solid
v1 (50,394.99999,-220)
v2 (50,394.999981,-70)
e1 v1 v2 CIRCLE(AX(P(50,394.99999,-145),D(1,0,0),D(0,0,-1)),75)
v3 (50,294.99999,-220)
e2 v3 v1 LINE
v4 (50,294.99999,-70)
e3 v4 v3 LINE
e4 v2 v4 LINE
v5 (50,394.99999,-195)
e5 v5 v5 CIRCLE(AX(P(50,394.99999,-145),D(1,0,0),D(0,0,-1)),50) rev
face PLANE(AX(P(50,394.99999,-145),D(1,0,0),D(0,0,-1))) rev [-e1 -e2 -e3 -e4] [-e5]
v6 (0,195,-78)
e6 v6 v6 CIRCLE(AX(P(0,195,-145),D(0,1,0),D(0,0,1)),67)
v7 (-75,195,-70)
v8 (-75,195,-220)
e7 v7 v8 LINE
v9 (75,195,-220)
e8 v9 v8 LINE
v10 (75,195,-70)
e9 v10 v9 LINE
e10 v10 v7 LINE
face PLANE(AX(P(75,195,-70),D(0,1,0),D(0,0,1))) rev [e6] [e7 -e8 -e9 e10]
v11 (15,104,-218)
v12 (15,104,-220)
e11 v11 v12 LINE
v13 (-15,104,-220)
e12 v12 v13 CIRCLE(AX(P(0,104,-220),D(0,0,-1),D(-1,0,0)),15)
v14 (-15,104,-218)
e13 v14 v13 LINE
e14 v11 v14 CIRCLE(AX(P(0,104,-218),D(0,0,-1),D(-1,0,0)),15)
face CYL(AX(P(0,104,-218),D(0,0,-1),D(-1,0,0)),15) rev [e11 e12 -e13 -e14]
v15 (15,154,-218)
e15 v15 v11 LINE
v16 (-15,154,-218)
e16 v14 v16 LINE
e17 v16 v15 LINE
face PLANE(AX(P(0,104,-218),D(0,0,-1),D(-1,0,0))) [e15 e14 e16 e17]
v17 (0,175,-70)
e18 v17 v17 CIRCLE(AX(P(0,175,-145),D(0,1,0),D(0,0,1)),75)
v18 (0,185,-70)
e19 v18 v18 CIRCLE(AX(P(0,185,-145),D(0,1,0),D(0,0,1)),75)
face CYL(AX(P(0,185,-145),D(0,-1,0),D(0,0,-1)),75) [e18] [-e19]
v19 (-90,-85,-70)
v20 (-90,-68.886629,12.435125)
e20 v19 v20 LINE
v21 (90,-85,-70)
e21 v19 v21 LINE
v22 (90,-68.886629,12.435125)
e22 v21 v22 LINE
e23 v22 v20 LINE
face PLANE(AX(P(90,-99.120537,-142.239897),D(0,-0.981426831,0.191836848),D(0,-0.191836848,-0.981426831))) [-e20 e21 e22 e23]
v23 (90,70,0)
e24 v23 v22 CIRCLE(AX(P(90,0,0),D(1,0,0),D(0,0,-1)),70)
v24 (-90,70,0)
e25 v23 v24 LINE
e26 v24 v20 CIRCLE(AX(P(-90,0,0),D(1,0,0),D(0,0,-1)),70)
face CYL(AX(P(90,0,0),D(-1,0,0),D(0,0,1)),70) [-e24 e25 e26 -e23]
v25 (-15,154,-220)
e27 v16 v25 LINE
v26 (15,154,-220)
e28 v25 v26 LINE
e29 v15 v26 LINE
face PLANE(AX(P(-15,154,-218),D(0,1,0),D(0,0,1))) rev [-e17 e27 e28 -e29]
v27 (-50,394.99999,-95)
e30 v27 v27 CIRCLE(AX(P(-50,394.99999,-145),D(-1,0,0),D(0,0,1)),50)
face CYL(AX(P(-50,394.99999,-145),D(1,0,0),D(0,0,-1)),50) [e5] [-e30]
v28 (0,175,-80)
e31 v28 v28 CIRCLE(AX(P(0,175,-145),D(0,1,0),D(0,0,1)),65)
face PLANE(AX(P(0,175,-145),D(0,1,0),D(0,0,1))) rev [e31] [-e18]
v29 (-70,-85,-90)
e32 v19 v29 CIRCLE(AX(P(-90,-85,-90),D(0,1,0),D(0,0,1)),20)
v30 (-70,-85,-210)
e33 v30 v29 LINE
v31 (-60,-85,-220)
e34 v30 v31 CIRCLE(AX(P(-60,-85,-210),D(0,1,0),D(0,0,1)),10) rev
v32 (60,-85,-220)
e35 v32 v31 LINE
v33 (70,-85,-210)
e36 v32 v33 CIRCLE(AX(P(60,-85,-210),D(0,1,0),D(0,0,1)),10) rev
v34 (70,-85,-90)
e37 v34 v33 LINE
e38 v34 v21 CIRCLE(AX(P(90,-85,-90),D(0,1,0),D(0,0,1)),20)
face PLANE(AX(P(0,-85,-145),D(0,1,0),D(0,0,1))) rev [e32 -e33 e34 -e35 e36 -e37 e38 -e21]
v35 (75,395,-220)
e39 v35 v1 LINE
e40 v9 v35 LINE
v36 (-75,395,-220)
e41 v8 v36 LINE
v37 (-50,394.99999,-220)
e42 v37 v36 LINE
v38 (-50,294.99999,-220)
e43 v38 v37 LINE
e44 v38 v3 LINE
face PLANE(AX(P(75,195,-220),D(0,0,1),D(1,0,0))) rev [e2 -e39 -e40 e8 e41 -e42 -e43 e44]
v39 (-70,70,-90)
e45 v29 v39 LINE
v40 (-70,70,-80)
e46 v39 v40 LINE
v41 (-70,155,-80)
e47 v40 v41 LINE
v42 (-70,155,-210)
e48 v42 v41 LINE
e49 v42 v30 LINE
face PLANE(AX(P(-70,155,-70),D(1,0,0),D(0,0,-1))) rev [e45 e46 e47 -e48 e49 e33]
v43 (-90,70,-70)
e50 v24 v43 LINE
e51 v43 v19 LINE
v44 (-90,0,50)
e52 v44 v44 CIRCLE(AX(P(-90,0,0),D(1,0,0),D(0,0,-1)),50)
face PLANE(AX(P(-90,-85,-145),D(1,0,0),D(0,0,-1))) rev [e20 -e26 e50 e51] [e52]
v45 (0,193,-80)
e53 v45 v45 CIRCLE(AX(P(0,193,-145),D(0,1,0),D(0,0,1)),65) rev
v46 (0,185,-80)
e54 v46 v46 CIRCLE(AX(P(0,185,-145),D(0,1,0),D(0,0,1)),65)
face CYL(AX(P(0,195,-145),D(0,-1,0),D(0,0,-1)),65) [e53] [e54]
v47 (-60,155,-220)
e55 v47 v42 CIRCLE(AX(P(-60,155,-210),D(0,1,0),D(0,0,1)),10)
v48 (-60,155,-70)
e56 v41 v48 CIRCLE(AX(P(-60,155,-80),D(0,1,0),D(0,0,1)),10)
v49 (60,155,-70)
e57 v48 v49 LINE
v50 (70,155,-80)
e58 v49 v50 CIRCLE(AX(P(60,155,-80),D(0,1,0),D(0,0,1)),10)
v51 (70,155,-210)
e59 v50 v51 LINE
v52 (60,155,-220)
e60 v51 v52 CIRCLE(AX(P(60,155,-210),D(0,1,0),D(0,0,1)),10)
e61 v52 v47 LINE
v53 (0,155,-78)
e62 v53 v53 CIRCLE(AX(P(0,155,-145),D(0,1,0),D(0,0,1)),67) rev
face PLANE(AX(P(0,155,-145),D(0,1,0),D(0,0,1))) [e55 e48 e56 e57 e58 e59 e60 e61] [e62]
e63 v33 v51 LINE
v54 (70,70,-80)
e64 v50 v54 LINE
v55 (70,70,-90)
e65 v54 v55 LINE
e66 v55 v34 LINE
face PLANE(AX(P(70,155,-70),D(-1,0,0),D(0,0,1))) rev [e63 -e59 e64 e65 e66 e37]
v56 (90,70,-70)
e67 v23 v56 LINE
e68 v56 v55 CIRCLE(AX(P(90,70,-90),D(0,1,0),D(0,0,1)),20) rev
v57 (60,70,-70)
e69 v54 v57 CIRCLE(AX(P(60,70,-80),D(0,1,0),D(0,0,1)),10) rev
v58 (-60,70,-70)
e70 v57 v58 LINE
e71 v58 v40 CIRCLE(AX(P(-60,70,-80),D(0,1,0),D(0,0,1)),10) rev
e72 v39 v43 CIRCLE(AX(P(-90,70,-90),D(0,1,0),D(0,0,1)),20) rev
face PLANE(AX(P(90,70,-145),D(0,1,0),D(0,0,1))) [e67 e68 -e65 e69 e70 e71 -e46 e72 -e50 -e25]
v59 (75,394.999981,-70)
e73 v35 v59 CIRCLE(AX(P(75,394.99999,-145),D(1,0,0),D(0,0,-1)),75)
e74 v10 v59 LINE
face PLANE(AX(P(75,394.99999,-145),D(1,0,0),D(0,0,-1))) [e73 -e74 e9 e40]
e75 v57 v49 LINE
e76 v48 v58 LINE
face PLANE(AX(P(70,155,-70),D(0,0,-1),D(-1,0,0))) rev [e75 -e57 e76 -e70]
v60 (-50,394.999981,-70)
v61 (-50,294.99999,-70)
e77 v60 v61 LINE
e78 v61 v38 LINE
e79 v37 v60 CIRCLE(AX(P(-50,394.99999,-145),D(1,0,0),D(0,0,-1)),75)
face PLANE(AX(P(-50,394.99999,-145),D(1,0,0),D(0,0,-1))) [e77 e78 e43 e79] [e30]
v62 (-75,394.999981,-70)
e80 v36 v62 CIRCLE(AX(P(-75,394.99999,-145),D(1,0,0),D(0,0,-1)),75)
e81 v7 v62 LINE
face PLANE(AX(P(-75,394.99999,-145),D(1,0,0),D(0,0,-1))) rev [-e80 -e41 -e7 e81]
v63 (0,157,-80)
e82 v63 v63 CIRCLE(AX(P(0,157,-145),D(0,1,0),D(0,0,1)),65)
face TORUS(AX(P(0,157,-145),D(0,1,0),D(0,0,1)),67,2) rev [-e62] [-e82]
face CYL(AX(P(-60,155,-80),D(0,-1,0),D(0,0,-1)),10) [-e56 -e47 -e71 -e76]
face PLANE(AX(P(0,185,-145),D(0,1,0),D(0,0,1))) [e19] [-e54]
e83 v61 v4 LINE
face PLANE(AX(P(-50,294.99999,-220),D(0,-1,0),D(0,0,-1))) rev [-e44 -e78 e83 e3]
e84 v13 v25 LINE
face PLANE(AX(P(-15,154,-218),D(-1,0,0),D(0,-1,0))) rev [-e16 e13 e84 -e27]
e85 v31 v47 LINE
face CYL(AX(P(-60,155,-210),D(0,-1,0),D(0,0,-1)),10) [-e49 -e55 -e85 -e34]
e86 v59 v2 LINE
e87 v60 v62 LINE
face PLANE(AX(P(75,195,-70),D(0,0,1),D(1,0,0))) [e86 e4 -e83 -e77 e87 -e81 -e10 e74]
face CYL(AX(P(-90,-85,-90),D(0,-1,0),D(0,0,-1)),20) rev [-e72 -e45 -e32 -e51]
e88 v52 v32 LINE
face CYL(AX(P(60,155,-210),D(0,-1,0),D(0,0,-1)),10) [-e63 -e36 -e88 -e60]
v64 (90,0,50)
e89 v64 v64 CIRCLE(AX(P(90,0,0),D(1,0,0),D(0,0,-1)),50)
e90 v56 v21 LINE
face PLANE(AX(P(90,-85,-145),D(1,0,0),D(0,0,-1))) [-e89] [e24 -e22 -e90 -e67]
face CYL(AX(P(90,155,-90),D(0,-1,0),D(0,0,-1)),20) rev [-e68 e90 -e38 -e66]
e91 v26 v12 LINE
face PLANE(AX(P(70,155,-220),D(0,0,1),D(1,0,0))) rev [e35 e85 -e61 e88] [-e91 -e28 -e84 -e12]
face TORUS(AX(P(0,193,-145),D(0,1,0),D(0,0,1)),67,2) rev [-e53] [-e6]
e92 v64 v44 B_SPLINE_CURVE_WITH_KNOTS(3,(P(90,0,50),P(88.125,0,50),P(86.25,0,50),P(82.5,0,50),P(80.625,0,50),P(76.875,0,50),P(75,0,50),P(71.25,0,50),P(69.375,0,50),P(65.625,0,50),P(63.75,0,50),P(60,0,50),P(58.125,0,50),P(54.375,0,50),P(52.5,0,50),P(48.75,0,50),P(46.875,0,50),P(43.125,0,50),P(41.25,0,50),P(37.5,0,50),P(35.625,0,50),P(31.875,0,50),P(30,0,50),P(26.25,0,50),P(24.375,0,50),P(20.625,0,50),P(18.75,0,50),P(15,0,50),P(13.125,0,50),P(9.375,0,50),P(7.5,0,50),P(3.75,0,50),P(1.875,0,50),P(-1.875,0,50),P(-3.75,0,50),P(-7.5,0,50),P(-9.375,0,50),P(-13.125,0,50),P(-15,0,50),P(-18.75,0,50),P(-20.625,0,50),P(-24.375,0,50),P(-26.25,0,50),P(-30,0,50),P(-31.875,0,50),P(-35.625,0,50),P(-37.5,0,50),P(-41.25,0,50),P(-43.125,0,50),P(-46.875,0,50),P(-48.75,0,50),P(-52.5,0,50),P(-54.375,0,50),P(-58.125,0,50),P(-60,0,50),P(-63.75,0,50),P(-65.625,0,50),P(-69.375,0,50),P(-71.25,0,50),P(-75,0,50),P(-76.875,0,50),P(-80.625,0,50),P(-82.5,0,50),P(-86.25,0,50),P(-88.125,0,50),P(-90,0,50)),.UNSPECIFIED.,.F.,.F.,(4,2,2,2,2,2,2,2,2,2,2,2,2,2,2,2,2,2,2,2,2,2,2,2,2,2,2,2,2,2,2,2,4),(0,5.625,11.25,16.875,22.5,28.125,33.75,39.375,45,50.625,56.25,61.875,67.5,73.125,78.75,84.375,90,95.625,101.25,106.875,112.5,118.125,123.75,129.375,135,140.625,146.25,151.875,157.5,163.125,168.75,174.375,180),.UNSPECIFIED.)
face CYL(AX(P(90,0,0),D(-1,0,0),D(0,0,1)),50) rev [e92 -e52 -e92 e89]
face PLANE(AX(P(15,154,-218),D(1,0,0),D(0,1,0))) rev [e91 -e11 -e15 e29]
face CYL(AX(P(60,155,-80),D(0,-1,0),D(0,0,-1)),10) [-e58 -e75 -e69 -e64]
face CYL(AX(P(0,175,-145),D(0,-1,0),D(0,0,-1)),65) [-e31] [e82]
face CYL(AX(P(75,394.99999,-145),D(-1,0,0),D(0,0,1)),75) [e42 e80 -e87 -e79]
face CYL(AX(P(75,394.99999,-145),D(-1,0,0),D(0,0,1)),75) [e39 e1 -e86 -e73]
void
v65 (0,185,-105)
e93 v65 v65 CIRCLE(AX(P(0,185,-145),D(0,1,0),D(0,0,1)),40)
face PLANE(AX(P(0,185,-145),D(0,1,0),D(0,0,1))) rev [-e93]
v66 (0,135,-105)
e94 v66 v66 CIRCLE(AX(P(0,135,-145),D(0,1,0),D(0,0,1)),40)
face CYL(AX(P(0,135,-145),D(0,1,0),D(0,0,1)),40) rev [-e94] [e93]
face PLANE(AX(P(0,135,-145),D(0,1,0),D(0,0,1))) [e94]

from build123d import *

# Parameters (mm, degrees)
SKETCH1_W           = 140
SKETCH1_H           = 150
BOSS_EXTRUDE1_DEPTH = 240
SKETCH2_R           = 65
BOSS_EXTRUDE2_DEPTH = 20
SKETCH3_R           = 75
BOSS_EXTRUDE3_DEPTH = 10
SKETCH4_R           = 40
CUT_EXTRUDE2_DEPTH  = 50
SKETCH5_R           = 50
BOSS_EXTRUDE4_DEPTH = 90
FILLET1_R           = 2
FILLET2_R           = 20
FILLET3_R           = 10
SKETCH6_R           = 65
BOSS_EXTRUDE5_DEPTH = 10
BOSS_EXTRUDE6_DEPTH = 75
CUT_EXTRUDE3_DEPTH  = 50
SKETCH9_R           = 50
BOSS_EXTRUDE7_DEPTH = 100
FILLET4_R           = 2
CUT_EXTRUDE5_DEPTH  = 2


with BuildPart() as part:
    # Sketch1 → Boss-Extrude1 (new body)
    with BuildSketch(Plane(origin=(0, 0, 0), x_dir=(1, 0, 0), z_dir=(0, 1, 0))):
        Rectangle(SKETCH1_W, SKETCH1_H)
    extrude(amount=BOSS_EXTRUDE1_DEPTH)

    # Sketch2 → Boss-Extrude2 (add)
    with BuildSketch(Plane(origin=(0, 240, 0), x_dir=(1, 0, 0), z_dir=(0, 1, 0))):
        with Locations(Location((0, 0, 0), (0, 0, 270))):
            Circle(SKETCH2_R)
    extrude(amount=BOSS_EXTRUDE2_DEPTH)

    # Sketch3 → Boss-Extrude3 (add)
    with BuildSketch(Plane(origin=(0, 260, 0), x_dir=(1, 0, 0), z_dir=(0, 1, 0))):
        with Locations(Location((0, 0, 0), (0, 0, 270))):
            Circle(SKETCH3_R)
    extrude(amount=BOSS_EXTRUDE3_DEPTH)

    # Sketch4 → Cut-Extrude2 (cut)
    with BuildSketch(Plane(origin=(0, 270, 0), x_dir=(1, 0, 0), z_dir=(0, 1, 0))):
        with Locations(Location((0, 0, 0), (0, 0, 270))):
            Circle(SKETCH4_R)
    extrude(amount=-CUT_EXTRUDE2_DEPTH, mode=Mode.SUBTRACT)

    # Sketch5 → Boss-Extrude4 (add, symmetric)
    with BuildSketch(Plane(origin=(0, 0, 0), x_dir=(0, 0, -1), z_dir=(1, 0, 0))):
        with BuildLine():
            Line((-75, 155), (-145, 155))
            ThreePointArc((-145, 155), (-214.72110169, 91.242433746), (-157.435124514, 16.113370831))
            Line((-157.435124514, 16.113370831), (-75, 0))
            Line((-75, 0), (-75, 155))
        make_face()
        with Locations(Location((-145, 85, 0), (0, 0, 180))):
            Circle(SKETCH5_R, mode=Mode.SUBTRACT)
    extrude(amount=BOSS_EXTRUDE4_DEPTH, both=True)

    # Fillet1
    fillet1_edges = [part.edges().sort_by_distance(p)[0] for p in [
        (0, 240, -65),
    ]]
    fillet(fillet1_edges, radius=FILLET1_R)

    # Fillet2
    fillet2_edges = [part.edges().sort_by_distance(p)[0] for p in [
        (-70, 77.5, 75),
        (70, 77.5, 75),
    ]]
    fillet(fillet2_edges, radius=FILLET2_R - 0.0001)  # a hair under: the kernel refuses the full size

    # Fillet3
    fillet3_edges = [part.edges().sort_by_distance(p)[0] for p in [
        (-70, 120, -75),
        (70, 120, -75),
        (70, 197.5, 75),
        (-70, 197.5, 75),
    ]]
    fillet(fillet3_edges, radius=FILLET3_R)

    # Sketch6 → Boss-Extrude5 (add)
    with BuildSketch(Plane(origin=(0, 270, 0), x_dir=(1, 0, 0), z_dir=(0, 1, 0))):
        with Locations(Location((0, 0, 0), (0, 0, 270))):
            Circle(SKETCH6_R)
    extrude(amount=BOSS_EXTRUDE5_DEPTH)

    # Sketch7 → Boss-Extrude6 (add, symmetric)
    with BuildSketch(Plane(origin=(0, 0, 0), x_dir=(0, 0, -1), z_dir=(1, 0, 0))):
        with BuildLine():
            Line((-75, 280), (75, 280))
            Line((75, 280), (75, 480))
            ThreePointArc((75, 480), (-9.573e-06, 554.999990364), (-75, 479.999980853))
            Line((-75, 479.999980853), (-75, 280))
        make_face()
    extrude(amount=BOSS_EXTRUDE6_DEPTH, both=True)

    # Sketch8 → Cut-Extrude3 (cut, symmetric)
    with BuildSketch(Plane(origin=(0, 0, 0), x_dir=(0, 0, -1), z_dir=(1, 0, 0))):
        with BuildLine():
            Line((75, 479.999980853), (75, 379.999990427))
            Line((75, 379.999990427), (-75, 379.999990427))
            Line((-75, 379.999990427), (-75, 479.999980853))
            ThreePointArc((-75, 479.999980853), (0, 554.999990364), (75, 479.999980853))
        make_face()
    extrude(amount=CUT_EXTRUDE3_DEPTH, both=True, mode=Mode.SUBTRACT)

    # Sketch9 → Boss-Extrude7 (add)
    with BuildSketch(Plane.ZY.offset(-50)):
        with Locations(Location((0, 479.999990364, 0), (0, 0, 180))):
            Circle(SKETCH9_R)
    extrude(amount=BOSS_EXTRUDE7_DEPTH)

    # Fillet4
    fillet4_edges = [part.edges().sort_by_distance(p)[0] for p in [
        (0, 280, -65),
    ]]
    fillet(fillet4_edges, radius=FILLET4_R)

    # Sketch14 → Cut-Extrude5 (cut)
    with BuildSketch(Plane(origin=(0, 0, -75), x_dir=(-1, 0, 0), z_dir=(0, 0, -1))):
        with BuildLine():
            Line((-15, 239), (-15, 189))
            ThreePointArc((-15, 189), (0, 174), (15, 189))
            Line((15, 189), (15, 239))
            Line((15, 239), (-15, 239))
        make_face()
    extrude(amount=-CUT_EXTRUDE5_DEPTH, mode=Mode.SUBTRACT)


with BuildPart() as part_1:
    # Body-Move/Copy1: moved
    add(part.part.moved(Location((0, -85, -145))))


solid = part_1.part
